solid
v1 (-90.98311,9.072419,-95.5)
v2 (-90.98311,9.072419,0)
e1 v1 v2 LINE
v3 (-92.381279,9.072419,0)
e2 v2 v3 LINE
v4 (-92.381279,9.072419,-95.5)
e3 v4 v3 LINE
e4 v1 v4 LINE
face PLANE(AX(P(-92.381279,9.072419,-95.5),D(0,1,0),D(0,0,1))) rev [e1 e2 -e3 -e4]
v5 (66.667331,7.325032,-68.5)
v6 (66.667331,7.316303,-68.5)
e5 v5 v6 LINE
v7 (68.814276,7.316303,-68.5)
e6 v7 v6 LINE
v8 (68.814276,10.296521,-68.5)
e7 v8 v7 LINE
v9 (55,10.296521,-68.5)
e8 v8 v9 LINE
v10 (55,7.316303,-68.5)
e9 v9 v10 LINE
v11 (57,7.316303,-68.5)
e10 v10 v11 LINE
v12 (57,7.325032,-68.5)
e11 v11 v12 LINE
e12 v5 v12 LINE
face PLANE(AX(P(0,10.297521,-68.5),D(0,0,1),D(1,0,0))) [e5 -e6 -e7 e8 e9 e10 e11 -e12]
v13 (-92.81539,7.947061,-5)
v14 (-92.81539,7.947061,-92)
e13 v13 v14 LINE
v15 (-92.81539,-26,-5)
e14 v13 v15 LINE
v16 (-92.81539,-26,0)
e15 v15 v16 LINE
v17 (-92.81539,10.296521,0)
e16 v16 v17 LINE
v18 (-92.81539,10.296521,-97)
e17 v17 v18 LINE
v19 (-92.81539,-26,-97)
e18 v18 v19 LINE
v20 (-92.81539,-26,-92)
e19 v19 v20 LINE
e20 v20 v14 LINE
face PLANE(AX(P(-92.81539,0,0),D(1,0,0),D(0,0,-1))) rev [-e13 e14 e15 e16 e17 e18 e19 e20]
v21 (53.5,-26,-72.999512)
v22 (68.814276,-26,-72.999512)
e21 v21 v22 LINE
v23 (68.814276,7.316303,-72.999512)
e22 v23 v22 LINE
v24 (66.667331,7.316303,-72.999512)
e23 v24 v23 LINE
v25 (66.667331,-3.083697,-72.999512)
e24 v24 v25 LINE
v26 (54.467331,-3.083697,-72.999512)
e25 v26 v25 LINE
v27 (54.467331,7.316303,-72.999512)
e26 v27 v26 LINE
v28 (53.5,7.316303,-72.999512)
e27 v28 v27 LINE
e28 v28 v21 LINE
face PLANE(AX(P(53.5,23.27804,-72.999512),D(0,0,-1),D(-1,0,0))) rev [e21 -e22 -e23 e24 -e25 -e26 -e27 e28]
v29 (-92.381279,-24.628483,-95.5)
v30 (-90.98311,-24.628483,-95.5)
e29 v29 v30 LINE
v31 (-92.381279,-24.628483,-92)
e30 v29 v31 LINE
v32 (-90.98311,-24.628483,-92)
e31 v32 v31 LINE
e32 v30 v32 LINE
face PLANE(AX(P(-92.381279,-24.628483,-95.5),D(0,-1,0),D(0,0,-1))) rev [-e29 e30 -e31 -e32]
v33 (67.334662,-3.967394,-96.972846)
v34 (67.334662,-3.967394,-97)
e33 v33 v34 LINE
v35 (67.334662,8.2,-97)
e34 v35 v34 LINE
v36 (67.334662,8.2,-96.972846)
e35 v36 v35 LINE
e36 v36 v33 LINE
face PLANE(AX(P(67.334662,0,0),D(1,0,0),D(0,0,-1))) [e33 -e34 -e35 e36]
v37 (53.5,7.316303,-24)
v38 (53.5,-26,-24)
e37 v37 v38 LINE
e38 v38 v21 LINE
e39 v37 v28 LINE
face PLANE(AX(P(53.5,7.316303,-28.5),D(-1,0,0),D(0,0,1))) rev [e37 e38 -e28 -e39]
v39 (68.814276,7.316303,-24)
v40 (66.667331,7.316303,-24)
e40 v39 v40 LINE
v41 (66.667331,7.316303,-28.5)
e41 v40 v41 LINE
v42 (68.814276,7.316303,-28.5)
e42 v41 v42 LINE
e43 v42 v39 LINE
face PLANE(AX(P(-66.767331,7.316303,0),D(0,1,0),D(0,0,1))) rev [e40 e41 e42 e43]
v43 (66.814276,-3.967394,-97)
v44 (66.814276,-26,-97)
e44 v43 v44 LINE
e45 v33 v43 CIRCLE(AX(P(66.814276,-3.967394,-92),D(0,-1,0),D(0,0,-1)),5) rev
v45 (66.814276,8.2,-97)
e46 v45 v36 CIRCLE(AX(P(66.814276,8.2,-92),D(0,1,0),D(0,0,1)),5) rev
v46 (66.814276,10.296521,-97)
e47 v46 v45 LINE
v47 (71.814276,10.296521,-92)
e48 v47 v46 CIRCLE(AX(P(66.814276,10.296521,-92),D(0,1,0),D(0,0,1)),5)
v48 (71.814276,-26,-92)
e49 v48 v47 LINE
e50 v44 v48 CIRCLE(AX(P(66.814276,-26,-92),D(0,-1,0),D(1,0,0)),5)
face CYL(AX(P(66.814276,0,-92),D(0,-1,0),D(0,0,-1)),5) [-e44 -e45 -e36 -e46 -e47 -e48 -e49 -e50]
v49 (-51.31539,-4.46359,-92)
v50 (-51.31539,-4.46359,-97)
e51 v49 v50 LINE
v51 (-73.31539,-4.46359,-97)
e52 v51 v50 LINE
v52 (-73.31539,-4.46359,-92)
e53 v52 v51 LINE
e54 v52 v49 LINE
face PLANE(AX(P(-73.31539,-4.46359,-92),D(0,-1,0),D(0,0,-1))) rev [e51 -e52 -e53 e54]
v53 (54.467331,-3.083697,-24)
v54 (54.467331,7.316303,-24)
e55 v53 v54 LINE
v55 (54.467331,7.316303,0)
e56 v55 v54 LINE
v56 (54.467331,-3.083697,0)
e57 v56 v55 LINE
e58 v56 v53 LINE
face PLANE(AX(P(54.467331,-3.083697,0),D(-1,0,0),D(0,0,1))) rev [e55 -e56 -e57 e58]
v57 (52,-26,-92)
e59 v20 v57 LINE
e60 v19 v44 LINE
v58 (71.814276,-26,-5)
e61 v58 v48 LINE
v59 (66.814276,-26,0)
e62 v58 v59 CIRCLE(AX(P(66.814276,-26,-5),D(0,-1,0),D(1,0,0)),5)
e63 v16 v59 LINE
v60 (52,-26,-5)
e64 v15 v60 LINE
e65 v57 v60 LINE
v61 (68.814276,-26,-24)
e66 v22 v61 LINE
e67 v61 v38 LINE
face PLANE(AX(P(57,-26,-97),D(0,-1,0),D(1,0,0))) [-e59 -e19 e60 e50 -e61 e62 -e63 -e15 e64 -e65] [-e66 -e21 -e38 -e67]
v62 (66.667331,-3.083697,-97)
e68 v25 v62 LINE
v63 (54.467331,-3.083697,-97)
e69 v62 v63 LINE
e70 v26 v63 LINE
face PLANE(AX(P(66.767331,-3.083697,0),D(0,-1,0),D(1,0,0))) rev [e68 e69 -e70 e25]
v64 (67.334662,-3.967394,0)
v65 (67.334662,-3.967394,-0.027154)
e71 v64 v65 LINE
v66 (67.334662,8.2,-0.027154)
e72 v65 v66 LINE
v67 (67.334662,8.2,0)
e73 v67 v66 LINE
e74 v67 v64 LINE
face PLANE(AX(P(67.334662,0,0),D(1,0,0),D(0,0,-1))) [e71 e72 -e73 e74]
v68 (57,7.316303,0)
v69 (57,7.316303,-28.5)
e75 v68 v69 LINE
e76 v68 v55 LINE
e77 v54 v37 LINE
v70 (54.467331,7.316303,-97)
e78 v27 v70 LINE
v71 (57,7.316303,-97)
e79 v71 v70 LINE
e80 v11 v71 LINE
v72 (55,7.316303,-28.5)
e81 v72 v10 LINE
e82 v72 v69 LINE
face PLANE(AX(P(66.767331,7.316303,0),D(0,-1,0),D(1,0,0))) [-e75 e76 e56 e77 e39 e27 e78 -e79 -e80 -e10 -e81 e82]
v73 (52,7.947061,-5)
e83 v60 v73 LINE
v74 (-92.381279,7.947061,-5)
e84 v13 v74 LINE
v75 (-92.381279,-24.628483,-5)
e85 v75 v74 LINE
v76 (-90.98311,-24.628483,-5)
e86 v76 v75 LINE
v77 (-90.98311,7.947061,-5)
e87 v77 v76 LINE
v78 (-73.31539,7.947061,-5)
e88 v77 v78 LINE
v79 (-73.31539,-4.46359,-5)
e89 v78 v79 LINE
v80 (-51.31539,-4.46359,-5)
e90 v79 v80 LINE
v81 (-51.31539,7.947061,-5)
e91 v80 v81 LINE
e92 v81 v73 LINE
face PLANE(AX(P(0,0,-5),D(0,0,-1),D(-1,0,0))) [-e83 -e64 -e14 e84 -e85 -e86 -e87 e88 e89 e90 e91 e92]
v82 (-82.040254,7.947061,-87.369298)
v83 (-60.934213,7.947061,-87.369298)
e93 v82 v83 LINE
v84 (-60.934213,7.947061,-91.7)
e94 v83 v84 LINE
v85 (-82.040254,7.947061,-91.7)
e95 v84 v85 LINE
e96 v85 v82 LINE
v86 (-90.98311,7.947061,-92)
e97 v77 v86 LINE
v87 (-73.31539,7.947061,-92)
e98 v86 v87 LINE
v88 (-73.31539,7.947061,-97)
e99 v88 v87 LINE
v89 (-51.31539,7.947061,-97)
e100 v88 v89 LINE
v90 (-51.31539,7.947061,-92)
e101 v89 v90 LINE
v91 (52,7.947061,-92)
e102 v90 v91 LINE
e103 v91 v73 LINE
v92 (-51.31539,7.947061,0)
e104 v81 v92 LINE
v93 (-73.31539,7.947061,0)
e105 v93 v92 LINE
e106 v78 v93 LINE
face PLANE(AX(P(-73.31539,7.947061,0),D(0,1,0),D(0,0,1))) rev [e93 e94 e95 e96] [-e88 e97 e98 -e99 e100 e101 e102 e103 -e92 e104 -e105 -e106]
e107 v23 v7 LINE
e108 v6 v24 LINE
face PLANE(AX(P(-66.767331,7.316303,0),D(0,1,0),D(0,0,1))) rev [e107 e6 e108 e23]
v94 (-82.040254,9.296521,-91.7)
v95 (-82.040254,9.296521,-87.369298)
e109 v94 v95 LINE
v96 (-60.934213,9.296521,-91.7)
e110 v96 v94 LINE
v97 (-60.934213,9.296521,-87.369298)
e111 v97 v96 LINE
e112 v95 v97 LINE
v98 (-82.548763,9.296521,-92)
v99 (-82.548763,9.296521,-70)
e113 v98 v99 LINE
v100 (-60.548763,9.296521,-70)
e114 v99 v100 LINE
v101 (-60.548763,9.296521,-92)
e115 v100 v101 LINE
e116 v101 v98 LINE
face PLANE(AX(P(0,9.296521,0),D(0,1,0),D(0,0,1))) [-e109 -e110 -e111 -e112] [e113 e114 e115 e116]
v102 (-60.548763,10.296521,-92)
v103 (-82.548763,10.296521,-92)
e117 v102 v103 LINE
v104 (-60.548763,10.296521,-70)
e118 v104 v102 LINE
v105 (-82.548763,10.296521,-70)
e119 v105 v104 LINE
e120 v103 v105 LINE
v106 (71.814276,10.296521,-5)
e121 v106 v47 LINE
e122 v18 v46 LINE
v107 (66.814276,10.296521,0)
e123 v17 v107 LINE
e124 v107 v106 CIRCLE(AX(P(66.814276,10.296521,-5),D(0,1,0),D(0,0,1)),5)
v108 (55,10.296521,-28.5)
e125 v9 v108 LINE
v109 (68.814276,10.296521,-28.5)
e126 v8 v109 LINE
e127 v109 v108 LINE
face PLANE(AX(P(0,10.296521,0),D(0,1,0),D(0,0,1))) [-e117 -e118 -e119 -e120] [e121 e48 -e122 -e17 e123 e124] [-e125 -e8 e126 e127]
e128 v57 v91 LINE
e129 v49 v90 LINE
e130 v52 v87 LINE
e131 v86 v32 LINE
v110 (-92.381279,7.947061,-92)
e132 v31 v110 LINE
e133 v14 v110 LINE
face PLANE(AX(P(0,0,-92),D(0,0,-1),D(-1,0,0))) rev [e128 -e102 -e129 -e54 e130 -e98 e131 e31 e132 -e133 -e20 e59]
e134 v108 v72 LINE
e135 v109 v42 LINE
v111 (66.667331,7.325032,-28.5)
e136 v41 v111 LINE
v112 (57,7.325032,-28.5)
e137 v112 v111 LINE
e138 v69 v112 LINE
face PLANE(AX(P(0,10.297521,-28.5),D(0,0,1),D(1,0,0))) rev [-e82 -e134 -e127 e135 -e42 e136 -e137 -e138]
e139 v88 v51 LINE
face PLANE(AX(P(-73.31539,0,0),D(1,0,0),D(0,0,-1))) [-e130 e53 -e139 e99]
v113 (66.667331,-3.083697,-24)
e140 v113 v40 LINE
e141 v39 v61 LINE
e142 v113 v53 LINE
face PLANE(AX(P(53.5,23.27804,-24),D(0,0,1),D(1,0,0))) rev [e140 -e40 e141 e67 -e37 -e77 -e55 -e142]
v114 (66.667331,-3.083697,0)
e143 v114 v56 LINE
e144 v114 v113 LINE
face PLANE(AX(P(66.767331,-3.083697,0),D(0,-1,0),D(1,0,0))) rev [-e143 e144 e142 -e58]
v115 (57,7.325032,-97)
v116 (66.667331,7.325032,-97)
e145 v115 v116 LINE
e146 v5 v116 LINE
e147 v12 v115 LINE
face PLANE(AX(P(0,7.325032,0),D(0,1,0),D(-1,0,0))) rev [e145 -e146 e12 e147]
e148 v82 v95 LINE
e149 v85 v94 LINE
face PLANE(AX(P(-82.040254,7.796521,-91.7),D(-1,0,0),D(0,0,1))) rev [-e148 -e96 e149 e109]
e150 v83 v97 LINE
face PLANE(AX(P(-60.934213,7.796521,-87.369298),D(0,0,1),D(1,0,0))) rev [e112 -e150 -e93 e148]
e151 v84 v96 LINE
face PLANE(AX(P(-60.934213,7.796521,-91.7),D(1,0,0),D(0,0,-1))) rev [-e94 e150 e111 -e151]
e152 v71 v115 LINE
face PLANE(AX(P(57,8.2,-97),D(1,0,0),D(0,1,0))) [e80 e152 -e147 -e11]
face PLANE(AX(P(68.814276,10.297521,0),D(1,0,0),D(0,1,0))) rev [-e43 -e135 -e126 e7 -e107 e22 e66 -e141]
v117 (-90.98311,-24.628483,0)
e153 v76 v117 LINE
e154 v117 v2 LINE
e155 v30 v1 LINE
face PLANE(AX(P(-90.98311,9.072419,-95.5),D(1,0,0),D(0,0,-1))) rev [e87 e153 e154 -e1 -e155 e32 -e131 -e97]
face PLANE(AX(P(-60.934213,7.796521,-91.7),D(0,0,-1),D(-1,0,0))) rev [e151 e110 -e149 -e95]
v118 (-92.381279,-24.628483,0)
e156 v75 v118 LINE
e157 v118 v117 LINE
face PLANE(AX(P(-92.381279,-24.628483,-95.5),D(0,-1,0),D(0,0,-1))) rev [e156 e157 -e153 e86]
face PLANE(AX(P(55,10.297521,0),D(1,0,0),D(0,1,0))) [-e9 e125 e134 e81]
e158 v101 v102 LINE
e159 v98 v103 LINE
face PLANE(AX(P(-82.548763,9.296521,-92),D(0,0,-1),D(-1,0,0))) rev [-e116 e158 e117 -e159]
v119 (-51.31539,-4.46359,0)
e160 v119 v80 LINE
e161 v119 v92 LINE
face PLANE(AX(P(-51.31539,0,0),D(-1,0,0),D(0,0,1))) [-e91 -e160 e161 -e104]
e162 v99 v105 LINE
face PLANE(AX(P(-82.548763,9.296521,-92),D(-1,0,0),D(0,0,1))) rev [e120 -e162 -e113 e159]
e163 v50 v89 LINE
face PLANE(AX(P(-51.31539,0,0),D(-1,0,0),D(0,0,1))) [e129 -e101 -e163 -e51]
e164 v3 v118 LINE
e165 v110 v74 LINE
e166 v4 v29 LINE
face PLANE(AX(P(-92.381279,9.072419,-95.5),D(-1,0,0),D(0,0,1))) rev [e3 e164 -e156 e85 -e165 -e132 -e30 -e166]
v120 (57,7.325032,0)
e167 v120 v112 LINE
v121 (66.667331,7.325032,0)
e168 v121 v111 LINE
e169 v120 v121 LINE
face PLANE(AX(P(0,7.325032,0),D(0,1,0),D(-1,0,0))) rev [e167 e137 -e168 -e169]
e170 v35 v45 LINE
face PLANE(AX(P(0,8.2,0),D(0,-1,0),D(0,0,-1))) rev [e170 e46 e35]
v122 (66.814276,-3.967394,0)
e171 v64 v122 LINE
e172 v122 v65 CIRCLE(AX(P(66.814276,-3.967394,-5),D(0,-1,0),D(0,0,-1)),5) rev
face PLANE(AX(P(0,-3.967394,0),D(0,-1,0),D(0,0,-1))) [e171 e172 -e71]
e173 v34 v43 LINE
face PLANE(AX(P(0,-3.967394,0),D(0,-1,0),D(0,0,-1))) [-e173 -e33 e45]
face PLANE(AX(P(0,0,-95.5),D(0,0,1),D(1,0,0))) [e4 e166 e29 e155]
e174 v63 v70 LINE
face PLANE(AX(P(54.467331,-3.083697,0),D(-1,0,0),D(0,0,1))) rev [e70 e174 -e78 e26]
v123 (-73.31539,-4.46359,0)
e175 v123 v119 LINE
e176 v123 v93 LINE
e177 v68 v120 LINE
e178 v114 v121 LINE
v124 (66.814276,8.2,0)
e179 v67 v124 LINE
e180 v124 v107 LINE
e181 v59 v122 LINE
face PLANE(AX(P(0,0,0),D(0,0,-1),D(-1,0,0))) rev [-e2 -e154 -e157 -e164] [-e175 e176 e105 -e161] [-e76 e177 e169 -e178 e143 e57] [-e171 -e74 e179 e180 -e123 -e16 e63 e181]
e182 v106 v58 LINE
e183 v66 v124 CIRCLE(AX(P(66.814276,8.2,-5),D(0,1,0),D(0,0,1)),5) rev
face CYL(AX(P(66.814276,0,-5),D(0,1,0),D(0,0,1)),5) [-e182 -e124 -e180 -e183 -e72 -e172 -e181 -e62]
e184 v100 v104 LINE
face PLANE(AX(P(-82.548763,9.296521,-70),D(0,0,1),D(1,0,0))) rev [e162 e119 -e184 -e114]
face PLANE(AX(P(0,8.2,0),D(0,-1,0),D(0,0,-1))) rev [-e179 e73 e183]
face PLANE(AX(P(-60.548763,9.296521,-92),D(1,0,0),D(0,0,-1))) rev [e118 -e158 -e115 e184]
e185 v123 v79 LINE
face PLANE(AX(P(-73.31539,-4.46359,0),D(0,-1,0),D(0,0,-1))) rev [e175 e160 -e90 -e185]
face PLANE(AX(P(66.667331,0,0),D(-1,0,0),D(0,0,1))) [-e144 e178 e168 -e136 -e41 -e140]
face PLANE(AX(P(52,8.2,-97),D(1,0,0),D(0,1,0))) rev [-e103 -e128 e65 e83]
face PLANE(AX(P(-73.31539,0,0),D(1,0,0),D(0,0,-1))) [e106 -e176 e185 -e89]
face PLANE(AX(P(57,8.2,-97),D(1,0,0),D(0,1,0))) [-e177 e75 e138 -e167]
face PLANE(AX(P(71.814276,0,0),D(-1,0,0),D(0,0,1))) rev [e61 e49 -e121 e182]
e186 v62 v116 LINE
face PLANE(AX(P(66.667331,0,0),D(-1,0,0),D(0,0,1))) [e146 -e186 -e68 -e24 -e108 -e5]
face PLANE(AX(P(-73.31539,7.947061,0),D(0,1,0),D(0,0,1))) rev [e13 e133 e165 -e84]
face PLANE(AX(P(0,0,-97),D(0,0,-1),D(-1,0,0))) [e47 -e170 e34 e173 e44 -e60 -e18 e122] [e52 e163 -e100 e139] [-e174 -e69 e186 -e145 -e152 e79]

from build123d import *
from build123d.topology import SkipClean

# Parameters (mm, degrees)
CROQUIS1_W              = 114
CROQUIS1_H              = 34.2
SALIENTE_EXTRUIR1_DEPTH = 97
VACIADO1_T              = -5
SALIENTE_EXTRUIR2_DEPTH = 97
CORTAR_EXTRUIR1_REACH   = 128.031
CROQUIS3_W              = 13.814275766
CROQUIS3_H              = 40
REDONDEO2_R             = 5
CROQUIS6_W              = 12.3
CROQUIS6_H              = 10.4
CORTAR_EXTRUIR3_DEPTH   = 124.459670354
SALIENTE_EXTRUIR3_DEPTH = 97
CROQUIS8_W              = 13.814275766
CROQUIS8_H              = 40
CORTAR_EXTRUIR4_DEPTH   = 127.030661617
CROQUIS9_W              = 104
CROQUIS9_H              = 87
CORTAR_EXTRUIR5_DEPTH   = 10
CORTAR_EXTRUIR6_START   = -33.316303
CROQUIS11_W             = 1.5
CROQUIS11_H             = 39.999512223
CROQUIS11_H_2           = 40
CORTAR_EXTRUIR6_DEPTH   = 33.316303
CORTAR_EXTRUIR7_START   = -33.316303
CROQUIS13_W             = 15.314275766
CROQUIS13_H             = 4.5
CORTAR_EXTRUIR7_DEPTH   = 33.316303
CROQUIS14_W             = 40
CROQUIS14_H             = 2.980218128
SALIENTE_EXTRUIR4_DEPTH = 15.498885391
CORTAR_EXTRUIR8_DEPTH   = 20.498885391
CROQUIS19_W             = 5
CROQUIS19_H             = 21.536410229
CROQUIS19_H_2           = 2.349460024
SALIENTE_EXTRUIR5_DEPTH = 22
CROQUIS20_W             = 5
CROQUIS20_H             = 36.296521374
SALIENTE_EXTRUIR6_DEPTH = 19.5
CROQUIS21_W             = 87
CROQUIS21_H             = 2.349460024
SALIENTE_EXTRUIR7_DEPTH = 144.815390375
CROQUIS23_W             = 1.39816901
CROQUIS23_H             = 33.700902132
CORTAR_EXTRUIR9_DEPTH   = 95.5
CROQUIS24_W             = 22.493754325
CROQUIS24_H             = 22.211308676
CORTAR_EXTRUIR10_DEPTH  = 1.5
CROQUIS25_W             = 5.544572311
CROQUIS25_H             = 16.748281631
CORTAR_EXTRUIR11_DEPTH  = 1.5
SALIENTE_EXTRUIR8_DEPTH = 46
CROQUIS27_W             = 22
CROQUIS27_H             = 22
CORTAR_EXTRUIR12_DEPTH  = 1
CROQUIS28_W             = 21.106040847
CROQUIS28_H             = 4.330702007
CORTAR_EXTRUIR14_DEPTH  = 1.5


with BuildPart() as part:
    # Croquis1 → Saliente-Extruir1 (new body)
    with BuildSketch(Plane.XY):
        with Locations((0, -8.9)):
            Rectangle(CROQUIS1_W, CROQUIS1_H)
    extrude(amount=-SALIENTE_EXTRUIR1_DEPTH)

    # Vaciado1
    vaciado1_openings = [part.faces().sort_by_distance(p)[0] for p in [
        (0, -26, -48.5),
    ]]
    offset(amount=VACIADO1_T, openings=vaciado1_openings, kind=Kind.INTERSECTION)

    # Croquis2 → Saliente-Extruir2 (add, through all)
    with BuildSketch(Plane(origin=(0, 0, -97), x_dir=(-1, 0, 0), z_dir=(0, 0, -1))):
        Polygon((71.814275766, 8.2), (67.33466189, 8.2), (67.33466189, -3.967393508), (57, -3.967393508), (57, -26), (67.33466189, -26), (71.814275766, -26), align=None)
        Polygon((-57, 8.2), (57, 8.2), (67.33466189, 8.2), (71.814275766, 8.2), (71.814275766, 10.296521374), (-71.814275766, 10.296521374), (-71.814275766, 8.2), (-67.33466189, 8.2), align=None)
        Polygon((-67.33466189, -3.967393508), (-67.33466189, 8.2), (-71.814275766, 8.2), (-71.814275766, -26), (-67.33466189, -26), (-57, -26), (-57, -3.967393508), align=None)
    extrude(amount=-SALIENTE_EXTRUIR2_DEPTH)

    # Croquis3 → Cortar-Extruir1 (cut, up to next)
    with BuildSketch(Plane.XZ.offset(26), mode=Mode.PRIVATE) as cortar_extruir1_sk1:
        with Locations((-61.907137883, -48.5)):
            Rectangle(CROQUIS3_W, CROQUIS3_H)
    cortar_extruir1_tool1 = extrude(cortar_extruir1_sk1.sketch, amount=-CORTAR_EXTRUIR1_REACH, mode=Mode.PRIVATE) & part.part
    # Croquis3 → Cortar-Extruir1 (cut, up to next)
    with BuildSketch(Plane.XZ.offset(26), mode=Mode.PRIVATE) as cortar_extruir1_sk2:
        with Locations((61.907137883, -48.5)):
            Rectangle(CROQUIS3_W, CROQUIS3_H)
    cortar_extruir1_tool2 = extrude(cortar_extruir1_sk2.sketch, amount=-CORTAR_EXTRUIR1_REACH, mode=Mode.PRIVATE) & part.part
    add(cortar_extruir1_tool1.solids().sort_by_distance((-61.907138, -26, -48.5))[0], mode=Mode.SUBTRACT)
    add(cortar_extruir1_tool2.solids().sort_by_distance((61.907138, -26, -48.5))[0], mode=Mode.SUBTRACT)

    # Redondeo2
    # the kernel refuses this fillet: 5 mm, written as the material it takes off along each edge
    with BuildSketch(Plane(origin=(71.814275766, -38.5, -97), x_dir=(0, 0, 1), z_dir=(0, 1, 0)), Plane(origin=(71.814275766, -38.5, 0), x_dir=(-1, 0, 0), z_dir=(0, 1, 0)), Plane(origin=(-71.814275766, 22.796521374, -97), x_dir=(0, 0, 1), z_dir=(0, -1, 0)), Plane(origin=(-71.814275766, 22.796521374, 0), x_dir=(1, 0, 0), z_dir=(0, -1, 0))) as redondeo2_piece_1:
        with BuildLine():
            CenterArc((REDONDEO2_R, -REDONDEO2_R), REDONDEO2_R, 90, 90)
            Line((0, -REDONDEO2_R), (0, 0))
            Line((0, 0), (REDONDEO2_R, 0))
        make_face()
    extrude(amount=61.296521374, mode=Mode.SUBTRACT)

    # Croquis6 → Cortar-Extruir3 (cut, through all)
    with BuildSketch(Plane(origin=(0, 0, -97), x_dir=(-1, 0, 0), z_dir=(0, 0, -1))):
        with Locations((-60.617330945, 2.116303246)):
            Rectangle(CROQUIS6_W, CROQUIS6_H)
        with Locations((60.617330945, 2.116303246)):
            Rectangle(CROQUIS6_W, CROQUIS6_H)
    extrude(amount=-CORTAR_EXTRUIR3_DEPTH, mode=Mode.SUBTRACT)

    # Croquis7 → Saliente-Extruir3 (add, through all)
    with BuildSketch(Plane(origin=(0, 0, -97), x_dir=(-1, 0, 0), z_dir=(0, 0, -1))):
        Polygon((57, 8.2), (57, 7.316303246), (66.667330945, 7.316303246), (66.667330945, -3.083696754), (57, -3.083696754), (57, -3.967393508), (66.814275766, -3.967393508), (67.33466189, -3.967393508), (67.33466189, 8.2), (66.814275766, 8.2), align=None)
        Polygon((-66.667330945, 7.32503221), (-57, 7.32503221), (-57, 8.2), (-66.814275766, 8.2), (-67.33466189, 8.2), (-67.33466189, -3.967393508), (-66.814275766, -3.967393508), (-57, -3.967393508), (-57, -3.083696754), (-66.667330945, -3.083696754), align=None)
    extrude(amount=-SALIENTE_EXTRUIR3_DEPTH)

    # Croquis8 → Cortar-Extruir4 (cut, through all)
    with BuildSketch(Plane(origin=(0, 10.296521374, 0), x_dir=(1, 0, 0), z_dir=(0, 1, 0))):
        with Locations((-61.907137883, 48.5)):
            Rectangle(CROQUIS8_W, CROQUIS8_H)
        with Locations((61.907137883, 48.5)):
            Rectangle(CROQUIS8_W, CROQUIS8_H)
    extrude(amount=-CORTAR_EXTRUIR4_DEPTH, mode=Mode.SUBTRACT)

    # Croquis9 → Cortar-Extruir5 (cut)
    with BuildSketch(Plane.XZ.offset(-3.2)):
        with Locations((0, -48.5)):
            Rectangle(CROQUIS9_W, CROQUIS9_H)
    extrude(amount=-CORTAR_EXTRUIR5_DEPTH, mode=Mode.SUBTRACT)

    # Croquis11 → Cortar-Extruir6 (cut)
    with SkipClean():  # the faces are left unmerged after this step: merging them gives an invalid solid
        with BuildSketch(Plane.XZ.offset(26).offset(CORTAR_EXTRUIR6_START)):
            with Locations((54.25, -48.499756112)):
                Rectangle(CROQUIS11_W, CROQUIS11_H)
            with Locations((-54.25, -48.5)):
                Rectangle(CROQUIS11_W, CROQUIS11_H_2)
        extrude(amount=CORTAR_EXTRUIR6_DEPTH, mode=Mode.SUBTRACT)

    # Croquis13 → Cortar-Extruir7 (cut)
    with BuildSketch(Plane.XZ.offset(26).offset(CORTAR_EXTRUIR7_START)):
        with Locations((-61.157137883, -26.25)):
            Rectangle(CROQUIS13_W, CROQUIS13_H)
        with Locations((-61.157137883, -70.75)):
            Rectangle(CROQUIS13_W, CROQUIS13_H)
        with Locations((61.157137883, -26.25)):
            Rectangle(CROQUIS13_W, CROQUIS13_H)
        with Locations((61.157137883, -70.749512223)):
            Rectangle(CROQUIS13_W, CROQUIS13_H)
    extrude(amount=CORTAR_EXTRUIR7_DEPTH, mode=Mode.SUBTRACT)

    # Croquis14 → Saliente-Extruir4 (add)
    with BuildSketch(Plane.ZY.offset(55)):
        with Locations((-48.5, 8.80641231)):
            Rectangle(CROQUIS14_W, CROQUIS14_H)
    extrude(amount=SALIENTE_EXTRUIR4_DEPTH)

    # Croquis16 → Cortar-Extruir8 (cut)
    with BuildSketch(Plane.ZY.offset(71.814275766)):
        Polygon((-5, 10.296521374), (-98.41592061, 10.296521374), (-98.41592061, -27.13789471), (0, -27.13789471), (0, 10.296521374), align=None)
    extrude(amount=-CORTAR_EXTRUIR8_DEPTH, mode=Mode.SUBTRACT)

    # Croquis19 → Saliente-Extruir5 (add)
    with BuildSketch(Plane.ZY.offset(51.315390375)):
        with Locations((-2.5, -15.231794886)):
            Rectangle(CROQUIS19_W, CROQUIS19_H)
        with Locations((-94.5, -15.231794886)):
            Rectangle(CROQUIS19_W, CROQUIS19_H)
        with Locations((-2.5, 9.121791362)):
            Rectangle(CROQUIS19_W, CROQUIS19_H_2)
        with Locations((-94.5, 9.121791362)):
            Rectangle(CROQUIS19_W, CROQUIS19_H_2)
    extrude(amount=SALIENTE_EXTRUIR5_DEPTH)

    # Croquis20 → Saliente-Extruir6 (add)
    with BuildSketch(Plane.ZY.offset(73.315390375)):
        with Locations((-2.5, -7.851739313)):
            Rectangle(CROQUIS20_W, CROQUIS20_H)
        with Locations((-94.5, -7.851739313)):
            Rectangle(CROQUIS20_W, CROQUIS20_H)
    extrude(amount=SALIENTE_EXTRUIR6_DEPTH)

    # Croquis21 → Saliente-Extruir7 (add)
    with BuildSketch(Plane.ZY.offset(-52)):
        with Locations((-48.5, 9.121791362)):
            Rectangle(CROQUIS21_W, CROQUIS21_H)
    extrude(amount=SALIENTE_EXTRUIR7_DEPTH)

    # Croquis23 → Cortar-Extruir9 (cut)
    with BuildSketch(Plane.XY):
        with Locations((-91.682194084, -7.778032427)):
            Rectangle(CROQUIS23_W, CROQUIS23_H)
    extrude(amount=-CORTAR_EXTRUIR9_DEPTH, mode=Mode.SUBTRACT)

    # Croquis24 → Cortar-Extruir10 (cut)
    with BuildSketch(Plane(origin=(0, 10.296521374, 0), x_dir=(1, 0, 0), z_dir=(0, 1, 0))):
        with Locations((-78.515448222, 48.5)):
            Rectangle(CROQUIS24_W, CROQUIS24_H)
    extrude(amount=-CORTAR_EXTRUIR10_DEPTH, mode=Mode.SUBTRACT)

    # Croquis25 → Cortar-Extruir11 (cut)
    with BuildSketch(Plane(origin=(0, 8.796521374, 0), x_dir=(1, 0, 0), z_dir=(0, 1, 0))):
        with Locations((-86.990039229, 48.639589487)):
            Rectangle(CROQUIS25_W, CROQUIS25_H)
    extrude(amount=-CORTAR_EXTRUIR11_DEPTH, mode=Mode.SUBTRACT)

    # Croquis26 → Saliente-Extruir8 (add)
    with BuildSketch(Plane(origin=(-89.762325384, 0, 0), x_dir=(0, 0, -1), z_dir=(1, 0, 0))):
        Polygon((59.605654338, 10.296521374), (37.394345662, 10.296521374), (37.394345662, 8.796521374), (40.265448671, 8.796521374), (40.265448671, 7.94706135), (57.013730302, 7.94706135), (57.013730302, 8.796521374), (59.605654338, 8.796521374), align=None)
    extrude(amount=SALIENTE_EXTRUIR8_DEPTH)

    # Croquis27 → Cortar-Extruir12 (cut)
    with BuildSketch(Plane(origin=(0, 10.296521374, 0), x_dir=(1, 0, 0), z_dir=(0, 1, 0))):
        with Locations((-71.548762692, 81)):
            Rectangle(CROQUIS27_W, CROQUIS27_H)
    extrude(amount=-CORTAR_EXTRUIR12_DEPTH, mode=Mode.SUBTRACT)

    # Croquis28 → Cortar-Extruir14 (cut)
    with BuildSketch(Plane(origin=(0, 9.296521374, 0), x_dir=(1, 0, 0), z_dir=(0, 1, 0))):
        with Locations((-71.487233446, 89.534648997)):
            Rectangle(CROQUIS28_W, CROQUIS28_H)
    extrude(amount=-CORTAR_EXTRUIR14_DEPTH, mode=Mode.SUBTRACT)


solid = part.part
